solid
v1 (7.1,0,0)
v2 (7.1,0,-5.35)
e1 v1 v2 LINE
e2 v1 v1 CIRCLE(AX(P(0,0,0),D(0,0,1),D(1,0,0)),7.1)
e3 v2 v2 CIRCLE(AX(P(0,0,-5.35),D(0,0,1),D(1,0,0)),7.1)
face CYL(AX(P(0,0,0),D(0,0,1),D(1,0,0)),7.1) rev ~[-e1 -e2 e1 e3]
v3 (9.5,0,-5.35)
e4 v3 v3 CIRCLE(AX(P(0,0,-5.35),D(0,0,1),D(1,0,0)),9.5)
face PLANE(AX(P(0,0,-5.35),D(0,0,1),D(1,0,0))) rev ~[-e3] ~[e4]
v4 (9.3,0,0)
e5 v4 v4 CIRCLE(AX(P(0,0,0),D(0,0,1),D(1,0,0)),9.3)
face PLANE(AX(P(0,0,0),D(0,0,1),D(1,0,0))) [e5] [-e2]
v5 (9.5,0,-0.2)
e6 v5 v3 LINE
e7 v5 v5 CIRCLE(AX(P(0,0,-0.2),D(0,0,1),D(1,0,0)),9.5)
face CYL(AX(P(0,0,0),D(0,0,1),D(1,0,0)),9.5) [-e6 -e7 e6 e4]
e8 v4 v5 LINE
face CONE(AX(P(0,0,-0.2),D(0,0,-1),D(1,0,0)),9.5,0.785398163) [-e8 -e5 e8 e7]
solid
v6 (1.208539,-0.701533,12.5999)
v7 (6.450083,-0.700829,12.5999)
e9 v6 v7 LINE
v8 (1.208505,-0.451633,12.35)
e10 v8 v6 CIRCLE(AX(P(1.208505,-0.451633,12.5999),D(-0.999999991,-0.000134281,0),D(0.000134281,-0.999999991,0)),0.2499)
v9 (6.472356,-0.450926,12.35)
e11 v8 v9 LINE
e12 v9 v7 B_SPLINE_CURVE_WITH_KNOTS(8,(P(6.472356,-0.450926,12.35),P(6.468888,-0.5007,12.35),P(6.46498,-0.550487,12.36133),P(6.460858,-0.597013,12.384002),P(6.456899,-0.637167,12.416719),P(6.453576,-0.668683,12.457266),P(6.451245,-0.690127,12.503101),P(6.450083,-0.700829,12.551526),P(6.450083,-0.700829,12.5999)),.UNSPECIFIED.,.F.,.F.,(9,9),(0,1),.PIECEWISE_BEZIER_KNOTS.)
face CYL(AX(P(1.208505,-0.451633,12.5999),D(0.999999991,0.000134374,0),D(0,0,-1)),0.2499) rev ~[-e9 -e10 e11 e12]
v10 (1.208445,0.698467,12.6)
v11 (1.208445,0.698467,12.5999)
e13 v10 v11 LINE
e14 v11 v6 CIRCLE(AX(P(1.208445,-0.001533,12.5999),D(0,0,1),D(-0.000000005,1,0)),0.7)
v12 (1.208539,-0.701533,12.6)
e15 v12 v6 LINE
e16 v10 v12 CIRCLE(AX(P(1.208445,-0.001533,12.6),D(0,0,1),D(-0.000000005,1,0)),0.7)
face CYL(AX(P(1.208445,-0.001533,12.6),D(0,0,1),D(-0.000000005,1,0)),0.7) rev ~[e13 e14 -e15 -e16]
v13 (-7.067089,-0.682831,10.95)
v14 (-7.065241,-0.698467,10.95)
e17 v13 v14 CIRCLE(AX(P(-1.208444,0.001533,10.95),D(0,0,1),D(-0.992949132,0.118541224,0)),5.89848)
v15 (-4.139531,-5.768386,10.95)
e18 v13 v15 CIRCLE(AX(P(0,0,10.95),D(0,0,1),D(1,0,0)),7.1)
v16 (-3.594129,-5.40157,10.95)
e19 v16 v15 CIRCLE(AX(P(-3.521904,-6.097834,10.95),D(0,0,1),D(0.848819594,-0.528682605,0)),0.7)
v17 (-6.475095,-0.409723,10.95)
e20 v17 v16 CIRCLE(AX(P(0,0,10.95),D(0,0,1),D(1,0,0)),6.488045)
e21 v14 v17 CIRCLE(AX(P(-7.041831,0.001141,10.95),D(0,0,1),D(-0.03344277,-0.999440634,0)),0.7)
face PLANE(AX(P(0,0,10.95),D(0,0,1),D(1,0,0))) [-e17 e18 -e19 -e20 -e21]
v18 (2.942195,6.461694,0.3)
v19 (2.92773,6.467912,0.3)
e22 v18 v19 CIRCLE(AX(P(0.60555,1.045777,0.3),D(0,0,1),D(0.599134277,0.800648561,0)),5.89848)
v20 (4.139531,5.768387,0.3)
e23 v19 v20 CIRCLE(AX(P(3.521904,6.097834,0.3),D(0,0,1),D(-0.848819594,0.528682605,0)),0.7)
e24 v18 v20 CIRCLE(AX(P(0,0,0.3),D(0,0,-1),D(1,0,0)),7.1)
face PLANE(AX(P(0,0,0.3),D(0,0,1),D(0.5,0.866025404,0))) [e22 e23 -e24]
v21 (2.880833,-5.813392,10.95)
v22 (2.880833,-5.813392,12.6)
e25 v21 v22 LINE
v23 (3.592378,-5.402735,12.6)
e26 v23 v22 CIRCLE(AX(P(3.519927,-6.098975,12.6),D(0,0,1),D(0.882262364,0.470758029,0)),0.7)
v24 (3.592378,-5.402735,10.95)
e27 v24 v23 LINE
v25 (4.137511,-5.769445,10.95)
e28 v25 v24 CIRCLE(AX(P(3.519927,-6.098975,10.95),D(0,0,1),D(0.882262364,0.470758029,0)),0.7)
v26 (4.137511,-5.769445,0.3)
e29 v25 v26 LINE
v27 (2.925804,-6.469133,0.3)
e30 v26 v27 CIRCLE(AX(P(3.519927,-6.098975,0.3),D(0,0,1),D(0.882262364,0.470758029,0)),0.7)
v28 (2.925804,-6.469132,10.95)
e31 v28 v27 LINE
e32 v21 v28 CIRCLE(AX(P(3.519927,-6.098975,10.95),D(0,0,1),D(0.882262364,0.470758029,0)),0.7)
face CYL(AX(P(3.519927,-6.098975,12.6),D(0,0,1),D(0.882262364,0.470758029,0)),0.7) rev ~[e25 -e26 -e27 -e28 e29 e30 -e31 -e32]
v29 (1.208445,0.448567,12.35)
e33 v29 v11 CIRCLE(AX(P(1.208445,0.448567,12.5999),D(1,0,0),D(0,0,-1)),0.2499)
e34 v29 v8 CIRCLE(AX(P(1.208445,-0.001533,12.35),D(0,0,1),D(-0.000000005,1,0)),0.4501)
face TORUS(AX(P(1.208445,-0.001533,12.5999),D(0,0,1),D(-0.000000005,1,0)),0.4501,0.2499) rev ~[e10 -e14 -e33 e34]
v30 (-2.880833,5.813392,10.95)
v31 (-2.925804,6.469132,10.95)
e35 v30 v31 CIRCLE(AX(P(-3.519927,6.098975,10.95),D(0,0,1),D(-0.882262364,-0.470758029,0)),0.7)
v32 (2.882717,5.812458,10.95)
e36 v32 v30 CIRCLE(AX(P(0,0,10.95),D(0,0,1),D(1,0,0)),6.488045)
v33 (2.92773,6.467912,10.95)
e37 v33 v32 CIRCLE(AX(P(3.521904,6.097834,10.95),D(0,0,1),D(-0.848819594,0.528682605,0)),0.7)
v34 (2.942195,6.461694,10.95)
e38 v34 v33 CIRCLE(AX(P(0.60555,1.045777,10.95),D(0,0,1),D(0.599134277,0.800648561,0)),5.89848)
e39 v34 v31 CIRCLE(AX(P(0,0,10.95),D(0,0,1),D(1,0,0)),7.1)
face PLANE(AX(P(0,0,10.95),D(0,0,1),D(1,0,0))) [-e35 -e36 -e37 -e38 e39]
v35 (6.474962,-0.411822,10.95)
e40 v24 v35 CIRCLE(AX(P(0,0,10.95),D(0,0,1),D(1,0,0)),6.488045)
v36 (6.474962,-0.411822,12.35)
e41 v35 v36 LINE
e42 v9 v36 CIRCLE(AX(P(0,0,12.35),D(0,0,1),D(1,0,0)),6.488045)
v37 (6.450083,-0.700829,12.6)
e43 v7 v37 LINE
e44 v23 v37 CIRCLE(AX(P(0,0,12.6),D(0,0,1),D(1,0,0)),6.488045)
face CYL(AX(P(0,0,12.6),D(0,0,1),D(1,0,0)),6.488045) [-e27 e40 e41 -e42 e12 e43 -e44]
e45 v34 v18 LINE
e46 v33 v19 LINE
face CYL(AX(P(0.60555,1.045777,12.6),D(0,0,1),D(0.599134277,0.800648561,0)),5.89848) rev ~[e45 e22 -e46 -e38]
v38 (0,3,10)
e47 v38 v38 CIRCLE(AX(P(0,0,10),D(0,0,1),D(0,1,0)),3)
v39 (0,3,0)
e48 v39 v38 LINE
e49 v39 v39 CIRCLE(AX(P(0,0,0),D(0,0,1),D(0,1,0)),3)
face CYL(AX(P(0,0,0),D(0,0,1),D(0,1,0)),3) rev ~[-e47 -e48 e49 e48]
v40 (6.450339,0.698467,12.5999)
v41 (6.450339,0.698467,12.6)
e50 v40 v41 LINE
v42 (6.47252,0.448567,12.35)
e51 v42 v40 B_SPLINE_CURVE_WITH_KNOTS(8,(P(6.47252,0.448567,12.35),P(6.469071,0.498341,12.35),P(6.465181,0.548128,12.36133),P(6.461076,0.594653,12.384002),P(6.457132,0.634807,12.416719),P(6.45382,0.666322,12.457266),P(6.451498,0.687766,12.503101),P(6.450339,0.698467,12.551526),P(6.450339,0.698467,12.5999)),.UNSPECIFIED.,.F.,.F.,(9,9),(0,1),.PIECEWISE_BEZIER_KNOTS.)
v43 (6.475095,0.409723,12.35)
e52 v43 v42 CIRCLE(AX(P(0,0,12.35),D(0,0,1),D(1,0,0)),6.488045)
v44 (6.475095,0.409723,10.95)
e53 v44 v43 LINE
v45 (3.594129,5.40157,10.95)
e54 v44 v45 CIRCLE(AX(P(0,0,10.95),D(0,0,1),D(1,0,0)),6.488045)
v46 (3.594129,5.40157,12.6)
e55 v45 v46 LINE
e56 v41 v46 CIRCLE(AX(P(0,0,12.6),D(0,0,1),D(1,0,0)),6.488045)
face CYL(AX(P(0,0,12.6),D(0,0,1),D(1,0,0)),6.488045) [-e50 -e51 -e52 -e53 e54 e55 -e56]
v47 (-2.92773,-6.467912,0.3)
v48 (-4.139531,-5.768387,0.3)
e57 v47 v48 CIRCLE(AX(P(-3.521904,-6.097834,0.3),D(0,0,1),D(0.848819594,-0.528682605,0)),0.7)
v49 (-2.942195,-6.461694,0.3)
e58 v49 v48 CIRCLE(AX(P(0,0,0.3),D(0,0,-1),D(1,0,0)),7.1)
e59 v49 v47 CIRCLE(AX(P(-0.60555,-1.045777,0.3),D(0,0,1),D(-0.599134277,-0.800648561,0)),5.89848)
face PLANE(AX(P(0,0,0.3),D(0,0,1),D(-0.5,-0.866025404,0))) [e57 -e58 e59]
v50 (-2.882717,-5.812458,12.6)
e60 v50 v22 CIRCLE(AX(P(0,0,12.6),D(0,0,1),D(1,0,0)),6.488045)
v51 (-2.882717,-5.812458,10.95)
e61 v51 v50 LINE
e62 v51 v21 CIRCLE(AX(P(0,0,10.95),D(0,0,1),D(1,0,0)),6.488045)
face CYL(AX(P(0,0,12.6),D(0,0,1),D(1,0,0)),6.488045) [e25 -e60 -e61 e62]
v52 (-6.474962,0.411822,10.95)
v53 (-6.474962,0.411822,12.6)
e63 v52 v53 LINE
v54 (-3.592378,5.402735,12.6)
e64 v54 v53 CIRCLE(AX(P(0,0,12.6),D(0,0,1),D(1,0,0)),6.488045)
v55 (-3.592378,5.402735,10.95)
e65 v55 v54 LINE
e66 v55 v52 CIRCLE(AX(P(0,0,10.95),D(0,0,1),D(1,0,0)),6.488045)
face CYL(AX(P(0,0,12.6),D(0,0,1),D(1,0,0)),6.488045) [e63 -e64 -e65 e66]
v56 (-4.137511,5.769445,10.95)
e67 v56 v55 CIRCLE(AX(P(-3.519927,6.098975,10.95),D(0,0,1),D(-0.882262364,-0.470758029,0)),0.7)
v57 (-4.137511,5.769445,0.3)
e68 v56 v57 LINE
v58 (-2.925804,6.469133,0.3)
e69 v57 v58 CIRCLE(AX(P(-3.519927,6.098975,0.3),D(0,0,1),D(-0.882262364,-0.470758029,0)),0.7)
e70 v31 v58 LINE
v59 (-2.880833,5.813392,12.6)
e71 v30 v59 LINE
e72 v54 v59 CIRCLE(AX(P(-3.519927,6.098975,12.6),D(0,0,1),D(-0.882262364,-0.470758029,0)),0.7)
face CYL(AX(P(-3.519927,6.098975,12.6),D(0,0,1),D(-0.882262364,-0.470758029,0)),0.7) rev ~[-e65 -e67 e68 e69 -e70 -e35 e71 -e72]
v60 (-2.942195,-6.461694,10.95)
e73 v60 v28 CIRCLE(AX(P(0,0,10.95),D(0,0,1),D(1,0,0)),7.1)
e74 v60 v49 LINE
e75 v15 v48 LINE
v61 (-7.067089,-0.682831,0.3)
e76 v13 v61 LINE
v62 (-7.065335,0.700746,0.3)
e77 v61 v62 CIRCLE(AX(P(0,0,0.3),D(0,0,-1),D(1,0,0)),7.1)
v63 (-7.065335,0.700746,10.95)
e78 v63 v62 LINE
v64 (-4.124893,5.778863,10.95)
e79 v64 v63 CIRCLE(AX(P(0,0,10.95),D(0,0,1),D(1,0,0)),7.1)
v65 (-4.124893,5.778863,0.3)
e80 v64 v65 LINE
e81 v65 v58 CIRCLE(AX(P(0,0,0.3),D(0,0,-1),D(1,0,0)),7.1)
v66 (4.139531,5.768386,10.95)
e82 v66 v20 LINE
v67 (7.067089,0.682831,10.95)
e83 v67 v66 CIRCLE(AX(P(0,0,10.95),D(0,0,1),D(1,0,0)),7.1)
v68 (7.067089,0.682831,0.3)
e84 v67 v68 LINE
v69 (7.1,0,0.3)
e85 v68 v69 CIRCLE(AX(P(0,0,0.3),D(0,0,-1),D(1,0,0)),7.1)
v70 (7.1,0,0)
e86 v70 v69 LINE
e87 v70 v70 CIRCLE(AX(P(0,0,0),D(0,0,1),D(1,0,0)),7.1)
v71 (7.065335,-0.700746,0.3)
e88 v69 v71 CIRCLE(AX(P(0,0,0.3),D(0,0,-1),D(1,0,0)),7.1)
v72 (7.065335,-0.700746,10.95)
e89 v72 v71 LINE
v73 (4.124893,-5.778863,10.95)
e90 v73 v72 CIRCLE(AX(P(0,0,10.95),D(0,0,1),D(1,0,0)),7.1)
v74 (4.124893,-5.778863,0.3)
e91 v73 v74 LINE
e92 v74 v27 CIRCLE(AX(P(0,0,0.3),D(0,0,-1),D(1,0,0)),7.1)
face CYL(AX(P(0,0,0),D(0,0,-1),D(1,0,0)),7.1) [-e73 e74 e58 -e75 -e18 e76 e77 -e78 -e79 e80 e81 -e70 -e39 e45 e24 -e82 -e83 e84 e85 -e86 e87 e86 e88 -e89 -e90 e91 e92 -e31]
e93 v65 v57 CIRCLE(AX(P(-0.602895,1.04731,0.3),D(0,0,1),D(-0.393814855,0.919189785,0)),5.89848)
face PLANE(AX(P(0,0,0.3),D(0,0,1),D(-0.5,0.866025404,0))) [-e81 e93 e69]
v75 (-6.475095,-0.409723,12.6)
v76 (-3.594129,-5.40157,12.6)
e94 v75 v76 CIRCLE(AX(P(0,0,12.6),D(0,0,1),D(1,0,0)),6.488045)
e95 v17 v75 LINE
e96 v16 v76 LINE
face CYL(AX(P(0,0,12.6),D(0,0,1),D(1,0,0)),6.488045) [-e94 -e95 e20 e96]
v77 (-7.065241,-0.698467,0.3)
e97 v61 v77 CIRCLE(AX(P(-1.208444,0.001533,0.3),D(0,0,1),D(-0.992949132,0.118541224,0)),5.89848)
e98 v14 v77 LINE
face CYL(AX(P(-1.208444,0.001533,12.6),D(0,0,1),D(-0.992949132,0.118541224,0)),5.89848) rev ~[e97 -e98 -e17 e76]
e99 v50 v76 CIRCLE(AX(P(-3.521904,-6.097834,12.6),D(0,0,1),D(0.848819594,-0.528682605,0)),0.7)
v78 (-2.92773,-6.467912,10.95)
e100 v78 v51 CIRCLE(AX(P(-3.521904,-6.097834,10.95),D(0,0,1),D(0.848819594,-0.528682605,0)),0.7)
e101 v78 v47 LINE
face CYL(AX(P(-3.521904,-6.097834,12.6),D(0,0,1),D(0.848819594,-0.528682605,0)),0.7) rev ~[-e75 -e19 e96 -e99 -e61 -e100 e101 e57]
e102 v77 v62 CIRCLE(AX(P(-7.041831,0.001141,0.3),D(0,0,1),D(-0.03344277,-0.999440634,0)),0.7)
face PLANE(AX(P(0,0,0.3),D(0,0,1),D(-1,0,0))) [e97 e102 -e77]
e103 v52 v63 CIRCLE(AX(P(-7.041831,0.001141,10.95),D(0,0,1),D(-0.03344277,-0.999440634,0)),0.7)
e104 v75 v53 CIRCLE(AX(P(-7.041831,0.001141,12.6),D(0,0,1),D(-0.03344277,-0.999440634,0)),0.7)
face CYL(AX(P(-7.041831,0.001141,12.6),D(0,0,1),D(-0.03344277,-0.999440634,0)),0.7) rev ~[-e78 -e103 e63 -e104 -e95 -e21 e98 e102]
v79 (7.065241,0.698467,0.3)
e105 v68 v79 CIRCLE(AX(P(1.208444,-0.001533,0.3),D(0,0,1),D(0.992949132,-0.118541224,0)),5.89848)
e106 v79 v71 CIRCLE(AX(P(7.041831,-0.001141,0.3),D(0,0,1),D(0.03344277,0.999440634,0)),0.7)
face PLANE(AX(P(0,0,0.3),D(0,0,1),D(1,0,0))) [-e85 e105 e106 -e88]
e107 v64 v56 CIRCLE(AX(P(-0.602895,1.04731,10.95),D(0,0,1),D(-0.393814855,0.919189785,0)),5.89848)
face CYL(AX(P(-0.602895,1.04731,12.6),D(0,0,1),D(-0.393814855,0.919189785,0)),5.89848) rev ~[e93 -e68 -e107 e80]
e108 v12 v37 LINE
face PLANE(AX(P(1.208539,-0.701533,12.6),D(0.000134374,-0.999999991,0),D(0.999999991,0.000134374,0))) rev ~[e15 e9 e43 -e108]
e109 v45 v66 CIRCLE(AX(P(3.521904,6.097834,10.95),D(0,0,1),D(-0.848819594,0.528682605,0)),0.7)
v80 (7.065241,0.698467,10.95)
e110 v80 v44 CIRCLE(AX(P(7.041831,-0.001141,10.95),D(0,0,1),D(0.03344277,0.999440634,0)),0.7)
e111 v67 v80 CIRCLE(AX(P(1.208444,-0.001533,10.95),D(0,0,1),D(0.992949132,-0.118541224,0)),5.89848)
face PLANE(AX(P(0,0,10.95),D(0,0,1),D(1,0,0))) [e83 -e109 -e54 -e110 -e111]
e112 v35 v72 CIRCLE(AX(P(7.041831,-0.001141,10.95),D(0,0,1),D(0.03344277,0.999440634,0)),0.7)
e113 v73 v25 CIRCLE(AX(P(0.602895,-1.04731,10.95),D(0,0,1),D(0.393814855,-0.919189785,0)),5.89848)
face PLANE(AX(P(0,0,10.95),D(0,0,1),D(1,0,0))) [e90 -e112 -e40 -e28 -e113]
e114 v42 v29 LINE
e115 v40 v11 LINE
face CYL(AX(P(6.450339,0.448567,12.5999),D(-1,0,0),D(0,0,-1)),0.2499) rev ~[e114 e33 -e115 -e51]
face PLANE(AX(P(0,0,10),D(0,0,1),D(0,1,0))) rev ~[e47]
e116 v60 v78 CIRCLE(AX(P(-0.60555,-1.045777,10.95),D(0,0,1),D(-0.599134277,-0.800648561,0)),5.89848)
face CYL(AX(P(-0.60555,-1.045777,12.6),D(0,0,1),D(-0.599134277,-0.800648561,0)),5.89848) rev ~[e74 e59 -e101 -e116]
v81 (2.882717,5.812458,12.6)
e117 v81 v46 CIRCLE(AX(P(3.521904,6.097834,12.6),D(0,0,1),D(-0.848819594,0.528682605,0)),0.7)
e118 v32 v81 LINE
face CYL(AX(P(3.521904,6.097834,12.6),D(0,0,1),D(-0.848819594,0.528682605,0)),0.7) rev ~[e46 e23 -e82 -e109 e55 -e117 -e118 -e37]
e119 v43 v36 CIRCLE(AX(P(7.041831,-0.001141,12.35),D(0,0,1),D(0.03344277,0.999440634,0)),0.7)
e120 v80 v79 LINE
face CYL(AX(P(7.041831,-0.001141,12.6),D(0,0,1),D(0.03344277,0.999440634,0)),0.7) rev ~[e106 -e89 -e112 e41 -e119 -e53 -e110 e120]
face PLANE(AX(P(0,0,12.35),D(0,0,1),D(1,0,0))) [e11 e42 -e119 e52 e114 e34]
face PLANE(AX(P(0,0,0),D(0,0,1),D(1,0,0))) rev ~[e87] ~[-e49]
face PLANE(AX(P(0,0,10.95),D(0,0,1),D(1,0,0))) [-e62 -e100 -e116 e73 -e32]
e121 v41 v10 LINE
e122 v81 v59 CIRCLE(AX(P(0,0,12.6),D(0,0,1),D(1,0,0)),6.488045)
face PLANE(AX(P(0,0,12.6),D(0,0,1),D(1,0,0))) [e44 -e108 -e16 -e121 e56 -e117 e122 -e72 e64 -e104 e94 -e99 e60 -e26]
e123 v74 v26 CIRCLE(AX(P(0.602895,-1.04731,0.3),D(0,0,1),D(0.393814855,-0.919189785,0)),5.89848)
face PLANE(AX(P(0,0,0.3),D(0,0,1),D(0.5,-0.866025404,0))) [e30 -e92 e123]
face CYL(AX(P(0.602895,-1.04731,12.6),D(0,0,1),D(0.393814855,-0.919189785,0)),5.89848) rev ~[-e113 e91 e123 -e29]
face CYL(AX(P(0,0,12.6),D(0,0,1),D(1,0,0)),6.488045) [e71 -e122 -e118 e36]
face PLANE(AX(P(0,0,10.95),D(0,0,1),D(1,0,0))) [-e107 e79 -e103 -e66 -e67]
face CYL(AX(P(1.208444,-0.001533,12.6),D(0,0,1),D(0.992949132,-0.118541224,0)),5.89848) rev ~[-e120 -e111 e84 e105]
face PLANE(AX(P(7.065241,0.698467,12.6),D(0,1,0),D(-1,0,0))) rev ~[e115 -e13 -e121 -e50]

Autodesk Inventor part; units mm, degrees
ref_plane "YZ Plane" through (0, 0, 0) normal (1, 0, 0) x (0, 1, 0)
ref_plane "XZ Plane" through (0, 0, 0) normal (0, 1, 0) x (-1, 0, 0)
ref_plane "XY Plane" through (0, 0, 0) normal (0, 0, 1) x (1, 0, 0)
sketch "Sketch1" plane through (0, 0, 0) normal (0, 0, 1) x (1, 0, 0)
  circle A0 centre (0, 0) radius 9.5
  circle A1 centre (0, 0) radius 7.1
  dimension "d0" = 19
  dimension "d1" = 14.2
extrude "Extrusion1" add sketch "Sketch1" along normal blind 12.6 contours A1
extrude "Extrusion2" add sketch "Sketch1" against normal blind 5.35
hole "Hole1" at (0, 0, 0) direction (0, 0, 1) diameter 6 depth 10
sketch "Sketch2" plane through (0, 0, 12.6) normal (0, 0, 1) x (1, 0, 0)
  arc A0 (7.065241, 0.698467) -> (7.065335, -0.700746) centre (7.041831, -0.001141) ccw
  arc A1 (7.065335, -0.700746) -> (7.065241, 0.698467) centre (1.208445, -0.001533) ccw
  arc A2 (1.208445, 0.698467) -> (1.208539, -0.701533) centre (1.208445, -0.001533) ccw
  line L0 (1.208445, 0.698467) -> (7.065241, 0.698467)
  circle A3 centre (0, 0) radius 7.1
  line L1 (7.065335, -0.700746) -> (1.208539, -0.701533)
  dimension "d25" = 0.7
  dimension "d26" = 0.7
sketch "Sketch2 outline for Extrusion3" plane through (0, 0, 12.6) normal (0, 0, 1) x (1, 0, 0)
  arc A0 (7.065241, 0.698467) -> (7.065335, -0.700746) centre (7.041831, -0.001141) ccw
  arc A1 (7.065335, -0.700746) -> (7.065241, 0.698467) centre (1.208445, -0.001533) ccw
extrude "Extrusion3" cut sketch "Sketch2 outline for Extrusion3" against normal blind 12.3
pattern_circular "Circular Pattern1" count 6 over 360 about axis through (0, 0, 0) along (0, 0, 1) of "Extrusion3"
sketch "Sketch3" plane through (0, 0, 12.6) normal (0, 0, 1) x (1, 0, 0)
  circle A0 centre (0, 0) radius 6.488045
  circle A1 centre (0, 0) radius 7.1
extrude "Extrusion4" cut sketch "Sketch3" against normal blind 1.65
sketch "Sketch2 outline for Extrusion5" plane through (0, 0, 12.6) normal (0, 0, 1) x (1, 0, 0)
  line L0 (7.065241, 0.698467) -> (1.208445, 0.698467)
  arc A0 (7.065335, -0.700746) -> (7.065241, 0.698467) centre (1.208445, -0.001533) ccw
  line L1 (1.208539, -0.701533) -> (7.065335, -0.700746)
  arc A1 (1.208445, 0.698467) -> (1.208539, -0.701533) centre (1.208445, -0.001533) ccw
extrude "Extrusion5" cut sketch "Sketch2 outline for Extrusion5" against normal blind 0.25
fillet "Fillet1" radius 0.25 3 edges at (0.5084, -0.0016, 12.35) (3.8293, -0.7012, 12.35) (3.8294, 0.6985, 12.35)
chamfer "Chamfer1" distance 0.2 angle 45 1 edges at (-9.5, 0, 0)
equation "\"d26\" = d25"
properties part number "Potentiometer knob" material "PC/ABS Plastic"
